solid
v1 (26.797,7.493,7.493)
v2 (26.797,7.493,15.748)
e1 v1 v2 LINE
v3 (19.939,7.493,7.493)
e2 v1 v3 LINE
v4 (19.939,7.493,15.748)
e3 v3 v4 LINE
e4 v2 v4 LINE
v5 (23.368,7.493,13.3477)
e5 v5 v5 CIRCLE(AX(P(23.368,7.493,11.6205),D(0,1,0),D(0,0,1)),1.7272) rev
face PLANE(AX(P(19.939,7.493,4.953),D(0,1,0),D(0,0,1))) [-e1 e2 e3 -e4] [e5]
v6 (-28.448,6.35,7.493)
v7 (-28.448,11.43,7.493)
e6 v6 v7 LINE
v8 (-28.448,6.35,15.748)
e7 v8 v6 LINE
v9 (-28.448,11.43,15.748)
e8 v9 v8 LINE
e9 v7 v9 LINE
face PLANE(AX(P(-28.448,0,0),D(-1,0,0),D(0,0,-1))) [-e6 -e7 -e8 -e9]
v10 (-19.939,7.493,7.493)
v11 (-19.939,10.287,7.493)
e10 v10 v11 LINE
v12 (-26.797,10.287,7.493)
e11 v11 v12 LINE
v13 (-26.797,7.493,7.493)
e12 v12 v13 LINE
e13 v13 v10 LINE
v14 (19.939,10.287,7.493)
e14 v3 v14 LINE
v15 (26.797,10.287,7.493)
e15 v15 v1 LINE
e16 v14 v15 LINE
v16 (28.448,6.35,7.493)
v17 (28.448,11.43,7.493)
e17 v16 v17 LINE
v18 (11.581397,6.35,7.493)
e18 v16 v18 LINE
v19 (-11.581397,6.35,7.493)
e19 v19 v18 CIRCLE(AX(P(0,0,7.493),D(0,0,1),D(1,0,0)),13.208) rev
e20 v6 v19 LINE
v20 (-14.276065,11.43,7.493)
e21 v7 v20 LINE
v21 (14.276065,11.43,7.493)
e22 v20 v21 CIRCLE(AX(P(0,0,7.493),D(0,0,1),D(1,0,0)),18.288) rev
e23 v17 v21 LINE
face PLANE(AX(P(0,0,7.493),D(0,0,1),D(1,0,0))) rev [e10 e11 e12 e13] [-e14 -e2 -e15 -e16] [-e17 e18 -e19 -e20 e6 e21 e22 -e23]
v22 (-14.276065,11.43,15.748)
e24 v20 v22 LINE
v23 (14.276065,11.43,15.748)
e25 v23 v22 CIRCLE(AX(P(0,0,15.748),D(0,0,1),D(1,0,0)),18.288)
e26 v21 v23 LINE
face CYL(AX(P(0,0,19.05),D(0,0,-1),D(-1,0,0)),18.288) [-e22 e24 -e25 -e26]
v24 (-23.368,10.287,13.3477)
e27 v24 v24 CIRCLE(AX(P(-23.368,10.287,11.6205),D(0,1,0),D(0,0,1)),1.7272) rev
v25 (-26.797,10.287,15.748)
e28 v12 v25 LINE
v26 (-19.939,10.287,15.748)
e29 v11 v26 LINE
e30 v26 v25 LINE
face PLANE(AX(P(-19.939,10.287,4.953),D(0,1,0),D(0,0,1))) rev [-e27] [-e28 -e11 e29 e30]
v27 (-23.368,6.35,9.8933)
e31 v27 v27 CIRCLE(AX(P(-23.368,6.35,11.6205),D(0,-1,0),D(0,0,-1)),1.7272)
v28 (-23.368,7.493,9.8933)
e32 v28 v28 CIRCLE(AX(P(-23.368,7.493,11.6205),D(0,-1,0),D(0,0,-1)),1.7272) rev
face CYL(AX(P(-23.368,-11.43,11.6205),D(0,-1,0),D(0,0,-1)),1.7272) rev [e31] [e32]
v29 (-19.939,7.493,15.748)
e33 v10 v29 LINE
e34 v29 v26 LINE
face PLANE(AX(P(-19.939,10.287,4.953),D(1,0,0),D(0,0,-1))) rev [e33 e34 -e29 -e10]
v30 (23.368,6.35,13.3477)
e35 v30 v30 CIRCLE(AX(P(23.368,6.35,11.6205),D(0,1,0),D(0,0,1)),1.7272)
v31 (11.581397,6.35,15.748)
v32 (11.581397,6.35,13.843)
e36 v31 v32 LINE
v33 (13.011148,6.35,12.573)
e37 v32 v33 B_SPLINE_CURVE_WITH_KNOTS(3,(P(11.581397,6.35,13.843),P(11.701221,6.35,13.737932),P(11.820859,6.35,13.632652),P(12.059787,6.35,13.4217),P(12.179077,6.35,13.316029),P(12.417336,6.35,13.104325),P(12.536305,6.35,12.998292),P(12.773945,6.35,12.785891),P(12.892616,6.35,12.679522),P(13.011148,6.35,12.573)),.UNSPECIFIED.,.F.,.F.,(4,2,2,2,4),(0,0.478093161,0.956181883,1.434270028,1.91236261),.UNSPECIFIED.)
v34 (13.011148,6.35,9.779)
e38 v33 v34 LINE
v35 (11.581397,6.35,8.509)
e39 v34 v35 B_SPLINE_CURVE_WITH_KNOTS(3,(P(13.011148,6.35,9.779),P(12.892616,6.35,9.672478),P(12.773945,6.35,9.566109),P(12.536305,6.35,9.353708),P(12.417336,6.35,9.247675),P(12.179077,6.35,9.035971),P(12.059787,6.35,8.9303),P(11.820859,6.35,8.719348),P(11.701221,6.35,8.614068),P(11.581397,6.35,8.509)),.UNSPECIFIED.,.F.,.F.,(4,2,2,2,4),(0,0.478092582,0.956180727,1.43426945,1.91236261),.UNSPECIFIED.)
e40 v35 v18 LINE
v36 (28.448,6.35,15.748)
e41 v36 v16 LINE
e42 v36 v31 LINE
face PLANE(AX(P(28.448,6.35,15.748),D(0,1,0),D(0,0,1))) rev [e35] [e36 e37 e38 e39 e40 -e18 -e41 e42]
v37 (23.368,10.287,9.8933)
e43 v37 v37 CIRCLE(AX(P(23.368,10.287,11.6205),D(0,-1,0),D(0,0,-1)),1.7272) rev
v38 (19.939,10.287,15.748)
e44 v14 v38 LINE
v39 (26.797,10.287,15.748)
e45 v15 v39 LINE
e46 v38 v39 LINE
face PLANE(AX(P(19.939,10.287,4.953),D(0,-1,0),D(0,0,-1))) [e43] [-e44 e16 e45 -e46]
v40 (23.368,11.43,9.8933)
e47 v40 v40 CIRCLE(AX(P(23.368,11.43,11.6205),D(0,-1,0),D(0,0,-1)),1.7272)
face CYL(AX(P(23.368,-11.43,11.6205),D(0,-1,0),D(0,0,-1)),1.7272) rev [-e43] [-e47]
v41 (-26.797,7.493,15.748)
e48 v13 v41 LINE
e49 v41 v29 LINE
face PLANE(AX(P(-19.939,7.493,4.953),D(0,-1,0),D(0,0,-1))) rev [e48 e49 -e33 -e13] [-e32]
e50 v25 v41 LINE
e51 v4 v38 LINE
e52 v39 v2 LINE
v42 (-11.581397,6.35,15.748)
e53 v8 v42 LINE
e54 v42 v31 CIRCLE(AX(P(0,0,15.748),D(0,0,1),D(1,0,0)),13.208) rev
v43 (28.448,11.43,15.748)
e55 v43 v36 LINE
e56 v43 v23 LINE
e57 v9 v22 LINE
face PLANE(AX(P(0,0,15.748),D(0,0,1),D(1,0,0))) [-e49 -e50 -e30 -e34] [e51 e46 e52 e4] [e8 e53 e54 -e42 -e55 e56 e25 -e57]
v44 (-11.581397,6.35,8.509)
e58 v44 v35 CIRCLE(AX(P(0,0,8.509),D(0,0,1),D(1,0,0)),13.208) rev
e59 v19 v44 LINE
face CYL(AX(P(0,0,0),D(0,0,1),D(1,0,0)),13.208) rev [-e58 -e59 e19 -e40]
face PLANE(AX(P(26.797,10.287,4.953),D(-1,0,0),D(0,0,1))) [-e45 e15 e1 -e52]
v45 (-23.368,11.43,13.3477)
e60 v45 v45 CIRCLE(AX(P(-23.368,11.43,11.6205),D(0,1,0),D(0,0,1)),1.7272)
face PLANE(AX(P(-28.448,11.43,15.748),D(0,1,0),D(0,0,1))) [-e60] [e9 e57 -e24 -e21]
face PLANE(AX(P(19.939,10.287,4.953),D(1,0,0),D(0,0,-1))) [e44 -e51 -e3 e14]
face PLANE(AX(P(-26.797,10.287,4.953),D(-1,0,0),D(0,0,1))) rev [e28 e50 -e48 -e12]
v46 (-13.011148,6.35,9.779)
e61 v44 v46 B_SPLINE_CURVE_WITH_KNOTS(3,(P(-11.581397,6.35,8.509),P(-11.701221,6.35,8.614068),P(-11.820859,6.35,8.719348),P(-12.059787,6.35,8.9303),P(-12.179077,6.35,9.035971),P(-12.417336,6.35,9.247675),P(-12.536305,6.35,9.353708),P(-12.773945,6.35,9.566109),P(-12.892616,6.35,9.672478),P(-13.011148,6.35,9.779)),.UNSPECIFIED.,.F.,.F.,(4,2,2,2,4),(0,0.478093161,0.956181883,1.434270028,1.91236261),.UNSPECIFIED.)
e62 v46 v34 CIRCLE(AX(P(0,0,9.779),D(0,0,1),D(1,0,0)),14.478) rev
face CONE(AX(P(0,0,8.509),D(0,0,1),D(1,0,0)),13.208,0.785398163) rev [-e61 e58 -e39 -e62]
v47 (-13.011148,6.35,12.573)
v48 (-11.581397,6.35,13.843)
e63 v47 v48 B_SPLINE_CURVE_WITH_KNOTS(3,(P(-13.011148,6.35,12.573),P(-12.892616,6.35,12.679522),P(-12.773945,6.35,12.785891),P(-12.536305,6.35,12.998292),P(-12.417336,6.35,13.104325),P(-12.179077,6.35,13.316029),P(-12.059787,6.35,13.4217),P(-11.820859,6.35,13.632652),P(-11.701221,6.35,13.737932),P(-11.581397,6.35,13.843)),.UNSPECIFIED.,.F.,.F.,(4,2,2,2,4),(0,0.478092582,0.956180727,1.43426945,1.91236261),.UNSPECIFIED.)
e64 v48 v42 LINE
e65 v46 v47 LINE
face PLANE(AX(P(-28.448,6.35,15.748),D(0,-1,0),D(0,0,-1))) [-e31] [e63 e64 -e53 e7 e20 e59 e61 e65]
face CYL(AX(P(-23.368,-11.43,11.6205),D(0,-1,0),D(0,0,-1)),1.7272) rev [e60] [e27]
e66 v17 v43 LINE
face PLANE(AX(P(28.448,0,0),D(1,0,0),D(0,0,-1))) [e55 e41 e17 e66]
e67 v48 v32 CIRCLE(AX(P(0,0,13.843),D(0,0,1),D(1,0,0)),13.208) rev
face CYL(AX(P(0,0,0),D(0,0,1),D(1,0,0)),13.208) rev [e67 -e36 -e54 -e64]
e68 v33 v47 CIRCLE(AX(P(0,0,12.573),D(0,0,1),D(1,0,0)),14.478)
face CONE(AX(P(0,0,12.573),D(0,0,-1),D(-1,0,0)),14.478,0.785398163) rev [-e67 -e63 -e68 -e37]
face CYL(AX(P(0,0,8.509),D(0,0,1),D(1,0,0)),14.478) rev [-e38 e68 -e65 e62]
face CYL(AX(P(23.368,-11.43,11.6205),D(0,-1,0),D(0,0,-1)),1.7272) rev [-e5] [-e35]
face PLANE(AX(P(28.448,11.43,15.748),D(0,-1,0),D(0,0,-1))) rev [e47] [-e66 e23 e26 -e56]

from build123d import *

# Parameters (mm, degrees)
SKETCH1_R                   = 18.288
BOSS_EXTRUDE1_DEPTH         = 19.05
SKETCH3_R                   = 13.208
CUT_EXTRUDE1_DEPTH          = 33.121712096
SKETCH15_W                  = 19.05
SKETCH15_H                  = 17.526
BOSS_EXTRUDE3_DEPTH         = 15.24
SKETCH16_W                  = 11.43
SKETCH16_H                  = 5.842
CUT_EXTRUDE4_DEPTH          = 39.82462909
CHAMFER1_SIZE               = 8.129699408
CHAMFER1_SIZE_2             = 5.08
F_1_4_CLEARANCE_HOLE1_D     = 6.7564
F_1_4_CLEARANCE_HOLE1_DEPTH = 3.448428068
SKETCH19_R                  = 18.288
SKETCH19_R_2                = 13.208
CUT_EXTRUDE5_DEPTH          = 0.762
CUT_EXTRUDE6_START          = -2.54
SKETCH20_R                  = 18.288
CUT_EXTRUDE6_DEPTH          = 2.54
SKETCH21_R                  = 18.288
CUT_EXTRUDE7_DEPTH          = 7.493
SKETCH22_W                  = 19.05
SKETCH22_H                  = 4.191
CUT_EXTRUDE8_DEPTH          = 42.148
SKETCH24_R                  = 14.478
CUT_EXTRUDE10_DEPTH         = 5.334
SKETCH25_W                  = 8.255
SKETCH25_H                  = 5.08
BOSS_EXTRUDE4_DEPTH         = 15.24
F_4_CLEARANCE_HOLE1_D       = 3.4544
SKETCH28_W                  = 6.858
SKETCH28_H                  = 2.794
CUT_EXTRUDE11_DEPTH         = 43.003222079
MIRROR3_COPY_1_SKETCH_W     = 6.858
MIRROR3_COPY_1_SKETCH_H     = 2.794
MIRROR3_COPY_1_DEPTH        = 43.003222079
SKETCH29_W                  = 78.170578527
SKETCH29_H                  = 29.425688311
CUT_EXTRUDE12_DEPTH         = 35.306
CHAMFER2_SIZE               = 1.27


# Some blends are built 0.0001 mm under size
with BuildPart() as part:
    # Sketch1 → Boss-Extrude1 (new body)
    with BuildSketch(Plane.XY):
        with Locations(Location((0, 0, 0), (0, 0, 180))):
            Circle(SKETCH1_R)
    extrude(amount=BOSS_EXTRUDE1_DEPTH)

    # Sketch3 → Cut-Extrude1 (cut, through all)
    with BuildSketch(Plane.XY.offset(19.05)):
        Circle(SKETCH3_R)
    extrude(amount=-CUT_EXTRUDE1_DEPTH, mode=Mode.SUBTRACT)

    # Sketch15 → Boss-Extrude3 (add)
    with BuildSketch(Plane(origin=(0, -13.716, 0), x_dir=(1, 0, 0), z_dir=(0, 1, 0))):
        with Locations((0, -9.525)):
            Rectangle(SKETCH15_W, SKETCH15_H)
    extrude(amount=-BOSS_EXTRUDE3_DEPTH)

    # Sketch16 → Cut-Extrude4 (cut, through all)
    with BuildSketch(Plane.XY.offset(18.288)):
        with Locations((0, -22.586571932)):
            Rectangle(SKETCH16_W, SKETCH16_H)
    extrude(amount=-CUT_EXTRUDE4_DEPTH, mode=Mode.SUBTRACT)

    # Chamfer1
    # the kernel refuses this chamfer: 8.129699408, 5.08 mm, written as the material it takes off along each edge
    with BuildSketch(Plane(origin=(-30.543101737, -28.956, 0.762), x_dir=(0, 0.9997899140358644, -0.020497019104217945), z_dir=(1, 0, 0))) as chamfer1_piece_1:
        Polygon((CHAMFER1_SIZE * 0.999789913978, CHAMFER1_SIZE * 0.020497019103), (-CHAMFER1_SIZE_2 * 0.0204970191042, CHAMFER1_SIZE_2 * 0.999789914036), (0, 0), align=None)
    extrude(amount=61.086203475, mode=Mode.SUBTRACT)

    # 1/4 Clearance Hole1
    with Locations(Plane(origin=(0, -28.956, 0), x_dir=(-1, 0, 0), z_dir=(0, -1, 0))):
        with Locations((0, -12.021417661)):
            Hole(F_1_4_CLEARANCE_HOLE1_D / 2, depth=F_1_4_CLEARANCE_HOLE1_DEPTH)

    # Sketch19 → Cut-Extrude5 (cut)
    with BuildSketch(Plane.XY.offset(19.05)):
        with Locations(Location((0, 0, 0), (0, 0, 238.611833536))):
            Circle(SKETCH19_R)
        Circle(SKETCH19_R_2, mode=Mode.SUBTRACT)
    extrude(amount=-CUT_EXTRUDE5_DEPTH, mode=Mode.SUBTRACT)

    # Sketch20 → Cut-Extrude6 (cut)
    with BuildSketch(Plane.XY.offset(18.288).offset(CUT_EXTRUDE6_START)):
        with Locations(Location((0, 0, 0), (0, 0, 238.611833536))):
            Circle(SKETCH20_R)
    extrude(amount=CUT_EXTRUDE6_DEPTH, mode=Mode.SUBTRACT)

    # Sketch21 → Cut-Extrude7 (cut)
    with BuildSketch(Plane(origin=(0, 0, 0), x_dir=(-1, 0, 0), z_dir=(0, 0, -1))):
        Circle(SKETCH21_R)
    extrude(amount=-CUT_EXTRUDE7_DEPTH, mode=Mode.SUBTRACT)

    # Sketch22 → Cut-Extrude8 (cut, through all)
    with BuildSketch(Plane(origin=(0, -13.716, 0), x_dir=(1, 0, 0), z_dir=(0, 1, 0))):
        with Locations((0, -2.8575)):
            Rectangle(SKETCH22_W, SKETCH22_H)
    extrude(amount=-CUT_EXTRUDE8_DEPTH, mode=Mode.SUBTRACT)

    # Sketch24 → Cut-Extrude10 (cut)
    with BuildSketch(Plane.XY.offset(13.843)):
        Circle(SKETCH24_R)
    extrude(amount=-CUT_EXTRUDE10_DEPTH, mode=Mode.SUBTRACT)

    # Sketch25 → Boss-Extrude4 (add)
    with BuildSketch(Plane(origin=(13.208, 0, 0), x_dir=(0, 0, -1), z_dir=(1, 0, 0))):
        with Locations((-11.6205, 8.89)):
            Rectangle(SKETCH25_W, SKETCH25_H)
        with Locations((-11.6205, -8.89)):
            Rectangle(SKETCH25_W, SKETCH25_H)
    boss_extrude4 = extrude(amount=BOSS_EXTRUDE4_DEPTH)

    # #4 Clearance Hole1 (through all)
    with Locations(Plane(origin=(0, -11.43, 0), x_dir=(-1, 0, 0), z_dir=(0, -1, 0))):
        with Locations((-23.368, -11.6205)):
            f_4_clearance_hole1 = Hole(F_4_CLEARANCE_HOLE1_D / 2)

    # Sketch28 → Cut-Extrude11 (cut, through all)
    with BuildSketch(Plane.XY.offset(15.748)):
        with Locations((23.368, -8.89)):
            Rectangle(SKETCH28_W, SKETCH28_H)
    cut_extrude11 = extrude(amount=-CUT_EXTRUDE11_DEPTH, mode=Mode.SUBTRACT)

    # Mirror2: Cut-Extrude11 across plane
    add(cut_extrude11.mirror(Plane.ZX), mode=Mode.SUBTRACT)

    # Mirror3: Boss-Extrude4, #4 Clearance Hole1, Cut-Extrude11 across plane
    add(boss_extrude4.mirror(Plane(origin=(0, 0, 0), x_dir=(0, 0, 1), z_dir=(1, 0, 0))))
    add(f_4_clearance_hole1.mirror(Plane(origin=(0, 0, 0), x_dir=(0, 0, 1), z_dir=(1, 0, 0))), mode=Mode.SUBTRACT)
    add(cut_extrude11.mirror(Plane(origin=(0, 0, 0), x_dir=(0, 0, 1), z_dir=(1, 0, 0))), mode=Mode.SUBTRACT)

    # Mirror3 copy 1 sketch → Mirror3 copy 1 (cut, through all)
    with BuildSketch(Plane(origin=(0, 0, 15.748), x_dir=(-1, 0, 0), z_dir=(0, 0, 1))):
        with Locations((23.368, -8.89)):
            Rectangle(MIRROR3_COPY_1_SKETCH_W, MIRROR3_COPY_1_SKETCH_H)
    extrude(amount=-MIRROR3_COPY_1_DEPTH, mode=Mode.SUBTRACT)

    # Sketch29 → Cut-Extrude12 (cut)
    with BuildSketch(Plane.XZ.offset(28.956)):
        with Locations((-0.790643495, 9.076690496)):
            Rectangle(SKETCH29_W, SKETCH29_H)
    extrude(amount=-CUT_EXTRUDE12_DEPTH, mode=Mode.SUBTRACT)

    # Chamfer2
    chamfer2_edges = [part.edges().sort_by_distance(p)[0] for p in [
        (0, 14.478, 8.509),
        (0, 14.478, 13.843),
    ]]
    chamfer(chamfer2_edges, length=CHAMFER2_SIZE - 0.0001)  # a hair under: the kernel refuses the full size


solid = part.part
